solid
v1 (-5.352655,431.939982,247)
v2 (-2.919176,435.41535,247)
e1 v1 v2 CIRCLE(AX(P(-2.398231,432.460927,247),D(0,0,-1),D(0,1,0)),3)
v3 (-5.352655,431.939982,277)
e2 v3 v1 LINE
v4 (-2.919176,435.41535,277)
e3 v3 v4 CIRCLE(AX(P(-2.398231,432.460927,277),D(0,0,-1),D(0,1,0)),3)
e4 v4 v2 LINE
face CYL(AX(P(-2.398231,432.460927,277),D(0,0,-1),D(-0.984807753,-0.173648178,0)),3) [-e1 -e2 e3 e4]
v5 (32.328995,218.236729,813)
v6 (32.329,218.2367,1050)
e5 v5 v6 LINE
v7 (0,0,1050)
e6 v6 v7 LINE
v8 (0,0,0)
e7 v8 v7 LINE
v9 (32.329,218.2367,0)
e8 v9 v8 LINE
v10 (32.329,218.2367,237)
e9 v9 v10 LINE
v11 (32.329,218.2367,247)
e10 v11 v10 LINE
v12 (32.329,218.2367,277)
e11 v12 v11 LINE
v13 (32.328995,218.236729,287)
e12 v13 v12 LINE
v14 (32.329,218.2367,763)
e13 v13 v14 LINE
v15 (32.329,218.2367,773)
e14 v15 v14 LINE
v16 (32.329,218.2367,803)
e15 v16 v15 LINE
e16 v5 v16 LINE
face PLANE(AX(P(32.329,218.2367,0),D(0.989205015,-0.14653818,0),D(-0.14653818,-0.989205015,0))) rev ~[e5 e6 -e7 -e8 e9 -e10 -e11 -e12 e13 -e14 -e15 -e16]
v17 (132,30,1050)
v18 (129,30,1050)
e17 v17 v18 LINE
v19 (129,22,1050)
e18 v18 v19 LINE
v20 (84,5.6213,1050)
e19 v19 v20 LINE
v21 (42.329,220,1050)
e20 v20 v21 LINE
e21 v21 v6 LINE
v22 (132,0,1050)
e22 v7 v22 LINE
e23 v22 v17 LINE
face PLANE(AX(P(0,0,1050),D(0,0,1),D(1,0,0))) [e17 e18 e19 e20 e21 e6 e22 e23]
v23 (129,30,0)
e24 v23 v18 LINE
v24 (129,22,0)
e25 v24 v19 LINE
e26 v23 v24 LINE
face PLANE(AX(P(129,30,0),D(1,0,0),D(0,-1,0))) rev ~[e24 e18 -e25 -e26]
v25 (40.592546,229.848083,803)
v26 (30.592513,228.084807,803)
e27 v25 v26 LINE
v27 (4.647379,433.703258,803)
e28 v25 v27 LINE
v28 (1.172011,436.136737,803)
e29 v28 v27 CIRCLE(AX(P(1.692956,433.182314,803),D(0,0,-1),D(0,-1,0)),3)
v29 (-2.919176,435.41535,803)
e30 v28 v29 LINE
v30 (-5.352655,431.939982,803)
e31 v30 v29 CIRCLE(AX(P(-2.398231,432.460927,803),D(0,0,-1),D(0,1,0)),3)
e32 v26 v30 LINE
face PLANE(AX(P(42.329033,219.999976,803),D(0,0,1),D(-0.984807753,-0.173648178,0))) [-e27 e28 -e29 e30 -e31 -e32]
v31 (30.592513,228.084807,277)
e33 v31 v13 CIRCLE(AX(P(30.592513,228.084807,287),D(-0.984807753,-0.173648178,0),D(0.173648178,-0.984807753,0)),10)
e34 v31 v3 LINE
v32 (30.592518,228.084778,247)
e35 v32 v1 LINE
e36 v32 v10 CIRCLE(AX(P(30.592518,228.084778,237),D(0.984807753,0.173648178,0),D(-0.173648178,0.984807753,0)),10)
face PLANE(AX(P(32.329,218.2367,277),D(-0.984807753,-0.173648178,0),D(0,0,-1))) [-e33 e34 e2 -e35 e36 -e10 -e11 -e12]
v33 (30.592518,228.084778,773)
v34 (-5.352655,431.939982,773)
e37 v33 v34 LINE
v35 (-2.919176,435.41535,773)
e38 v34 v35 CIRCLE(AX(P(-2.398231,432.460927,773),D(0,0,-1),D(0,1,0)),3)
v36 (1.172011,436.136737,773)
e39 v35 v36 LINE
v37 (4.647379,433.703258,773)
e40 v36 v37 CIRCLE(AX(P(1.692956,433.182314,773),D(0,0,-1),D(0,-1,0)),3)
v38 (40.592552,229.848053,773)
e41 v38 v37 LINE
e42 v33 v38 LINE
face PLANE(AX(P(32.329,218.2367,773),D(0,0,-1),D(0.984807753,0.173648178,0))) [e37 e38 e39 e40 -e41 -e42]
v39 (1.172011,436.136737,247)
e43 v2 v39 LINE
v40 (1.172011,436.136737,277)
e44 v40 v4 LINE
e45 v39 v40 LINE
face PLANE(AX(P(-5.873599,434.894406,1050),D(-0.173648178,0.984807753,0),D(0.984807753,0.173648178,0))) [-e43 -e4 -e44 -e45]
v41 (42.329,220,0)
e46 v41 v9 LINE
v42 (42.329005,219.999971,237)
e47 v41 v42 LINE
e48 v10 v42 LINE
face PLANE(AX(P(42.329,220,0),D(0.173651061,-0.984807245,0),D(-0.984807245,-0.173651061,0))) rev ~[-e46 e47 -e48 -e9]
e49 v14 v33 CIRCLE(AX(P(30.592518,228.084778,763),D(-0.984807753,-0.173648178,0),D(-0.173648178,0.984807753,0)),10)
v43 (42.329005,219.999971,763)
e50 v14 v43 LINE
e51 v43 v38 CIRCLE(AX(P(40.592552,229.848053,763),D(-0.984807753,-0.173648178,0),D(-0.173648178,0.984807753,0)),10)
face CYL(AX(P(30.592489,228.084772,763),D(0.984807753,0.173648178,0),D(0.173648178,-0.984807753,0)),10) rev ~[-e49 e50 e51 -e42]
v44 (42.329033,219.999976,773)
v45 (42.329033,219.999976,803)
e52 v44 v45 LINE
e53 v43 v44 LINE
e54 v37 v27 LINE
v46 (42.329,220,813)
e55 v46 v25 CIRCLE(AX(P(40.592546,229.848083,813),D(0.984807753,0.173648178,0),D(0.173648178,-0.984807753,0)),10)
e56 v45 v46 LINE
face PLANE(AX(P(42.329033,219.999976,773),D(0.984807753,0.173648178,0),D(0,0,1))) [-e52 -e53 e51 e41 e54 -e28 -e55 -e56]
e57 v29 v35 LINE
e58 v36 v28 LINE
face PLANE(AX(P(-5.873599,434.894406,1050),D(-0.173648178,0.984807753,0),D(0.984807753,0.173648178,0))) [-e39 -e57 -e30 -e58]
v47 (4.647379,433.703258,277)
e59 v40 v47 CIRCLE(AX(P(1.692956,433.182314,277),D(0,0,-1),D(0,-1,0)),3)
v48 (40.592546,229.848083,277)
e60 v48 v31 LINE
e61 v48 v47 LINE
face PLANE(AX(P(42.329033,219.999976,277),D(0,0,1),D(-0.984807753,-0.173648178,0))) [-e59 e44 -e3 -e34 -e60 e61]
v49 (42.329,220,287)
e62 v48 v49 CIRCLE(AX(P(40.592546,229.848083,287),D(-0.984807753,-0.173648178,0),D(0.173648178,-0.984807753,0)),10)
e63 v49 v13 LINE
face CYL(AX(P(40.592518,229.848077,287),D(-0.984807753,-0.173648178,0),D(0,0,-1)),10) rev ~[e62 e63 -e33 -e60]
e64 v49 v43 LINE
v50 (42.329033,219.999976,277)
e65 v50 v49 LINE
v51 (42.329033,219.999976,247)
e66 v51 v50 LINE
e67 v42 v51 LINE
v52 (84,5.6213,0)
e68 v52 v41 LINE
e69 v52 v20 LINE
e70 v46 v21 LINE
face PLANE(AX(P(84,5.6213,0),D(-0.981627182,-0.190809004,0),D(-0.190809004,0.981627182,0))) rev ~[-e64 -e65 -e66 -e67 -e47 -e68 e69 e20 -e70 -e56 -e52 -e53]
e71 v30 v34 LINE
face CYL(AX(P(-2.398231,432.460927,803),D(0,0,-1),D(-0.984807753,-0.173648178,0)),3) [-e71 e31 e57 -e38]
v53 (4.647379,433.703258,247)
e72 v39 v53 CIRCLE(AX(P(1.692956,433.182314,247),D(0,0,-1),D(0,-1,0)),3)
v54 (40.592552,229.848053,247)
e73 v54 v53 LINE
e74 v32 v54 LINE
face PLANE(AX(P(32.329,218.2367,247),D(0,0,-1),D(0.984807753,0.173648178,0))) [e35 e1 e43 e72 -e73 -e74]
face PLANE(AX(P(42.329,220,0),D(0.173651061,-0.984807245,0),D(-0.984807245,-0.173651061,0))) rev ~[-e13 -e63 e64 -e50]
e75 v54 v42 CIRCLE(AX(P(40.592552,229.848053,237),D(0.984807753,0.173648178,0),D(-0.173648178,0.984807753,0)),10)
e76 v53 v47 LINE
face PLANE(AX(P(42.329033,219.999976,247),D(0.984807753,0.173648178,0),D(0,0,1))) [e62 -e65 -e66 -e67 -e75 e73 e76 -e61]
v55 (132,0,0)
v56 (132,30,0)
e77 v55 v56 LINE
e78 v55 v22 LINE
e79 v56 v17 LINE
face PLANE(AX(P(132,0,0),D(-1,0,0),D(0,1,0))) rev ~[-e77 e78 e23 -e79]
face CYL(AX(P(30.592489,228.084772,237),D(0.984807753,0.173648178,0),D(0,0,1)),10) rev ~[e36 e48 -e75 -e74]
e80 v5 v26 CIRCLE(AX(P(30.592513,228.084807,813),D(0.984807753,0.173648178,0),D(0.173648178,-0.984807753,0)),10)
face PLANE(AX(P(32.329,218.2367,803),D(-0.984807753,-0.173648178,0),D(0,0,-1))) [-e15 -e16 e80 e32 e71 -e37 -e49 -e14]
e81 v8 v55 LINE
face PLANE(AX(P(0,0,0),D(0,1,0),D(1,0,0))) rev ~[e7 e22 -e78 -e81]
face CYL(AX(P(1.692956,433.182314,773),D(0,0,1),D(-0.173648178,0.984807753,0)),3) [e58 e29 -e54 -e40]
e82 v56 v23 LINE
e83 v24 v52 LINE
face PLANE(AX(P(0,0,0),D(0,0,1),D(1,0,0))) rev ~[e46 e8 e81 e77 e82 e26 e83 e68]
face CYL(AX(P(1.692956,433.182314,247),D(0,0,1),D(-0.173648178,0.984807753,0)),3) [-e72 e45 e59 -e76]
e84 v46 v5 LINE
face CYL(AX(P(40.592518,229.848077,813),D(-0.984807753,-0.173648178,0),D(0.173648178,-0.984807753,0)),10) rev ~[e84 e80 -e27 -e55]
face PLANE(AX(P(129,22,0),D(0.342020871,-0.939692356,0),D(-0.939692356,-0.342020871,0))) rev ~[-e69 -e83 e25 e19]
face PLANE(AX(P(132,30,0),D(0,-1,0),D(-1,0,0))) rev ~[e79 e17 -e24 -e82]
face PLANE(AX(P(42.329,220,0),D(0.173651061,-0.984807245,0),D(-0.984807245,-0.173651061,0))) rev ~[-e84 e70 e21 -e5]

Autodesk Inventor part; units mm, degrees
ref_plane "YZ Plane" through (0, 0, 0) normal (1, 0, 0) x (0, 1, 0)
ref_plane "XZ Plane" through (0, 0, 0) normal (0, 1, 0) x (-1, 0, 0)
ref_plane "XY Plane" through (0, 0, 0) normal (0, 0, 1) x (1, 0, 0)
sketch "Sketch1" plane through (0, 0, 0) normal (0, 0, 1) x (1, 0, 0)
  line L0 (0, 0) -> (132, 0)
  line L1 (132, 0) -> (132, 30)
  line L2 (132, 30) -> (129, 30)
  line L3 (42.329, 220) -> (32.329, 218.2367)
  line L4 (32.329, 218.2367) -> (0, 0)
  line L5 (129, 30) -> (129, 22)
  line L6 (129, 22) -> (84, 5.6213)
  line L7 (84, 5.6213) -> (114.3391, 5.6213) construction
  line L8 (84, 5.6213) -> (42.329, 220)
  dimension "d0" = 132
  dimension "d1" = 220
  dimension "d3" = 3
  dimension "d4" = 8
  dimension "d6" = 20
  dimension "d7" = 81
  dimension "d8" = 10
  dimension "d9" = 10
  dimension "d20" = 30
  dimension "d22" = 45
extrude "Extrusion1" add sketch "Sketch1" along normal blind 1050
sketch "Sketch2" plane through (32.329, 218.2367, 1050) normal (-0.1736482, 0.9848078, 0) x (0.9848078, 0.1736482, 0)
  line L0 (0, 277) -> (10.1543, 277)
  line L1 (10.1543, 277) -> (10.1543, 247)
  line L2 (10.1543, 247) -> (0, 247)
  line L3 (0, 247) -> (0, 277)
  line L4 (0, 1050) -> (0, 0) construction
  line L5 (0, 803) -> (10.1543, 803)
  line L6 (10.1543, 803) -> (10.1543, 773)
  line L7 (10.1543, 773) -> (0, 773)
  line L8 (0, 773) -> (0, 803)
  line L9 (13.9657, 1050) -> (0, 1050) construction
  line L10 (10.1543, 1050) -> (10.1543, 0) construction
  point P0 (-69.7343, 1050)
  dimension "d12" = 30
  dimension "d13" = 30
  dimension "d14" = 247
  dimension "d15" = 247
extrude "Extrusion2" add sketch "Sketch2" along normal blind 220
fillet "Fillet1" radius 3 4 edges at (4.1264, 436.6577, 788) (-5.8736, 434.8944, 788) (4.1264, 436.6577, 262) (-5.8736, 434.8944, 262)
fillet "Fillet2" radius 10 4 edges at (37.329, 219.1184, 803) (37.329, 219.1184, 277) (37.329, 219.1184, 773) (37.329, 219.1184, 247)
properties part number "sostenedor1"
